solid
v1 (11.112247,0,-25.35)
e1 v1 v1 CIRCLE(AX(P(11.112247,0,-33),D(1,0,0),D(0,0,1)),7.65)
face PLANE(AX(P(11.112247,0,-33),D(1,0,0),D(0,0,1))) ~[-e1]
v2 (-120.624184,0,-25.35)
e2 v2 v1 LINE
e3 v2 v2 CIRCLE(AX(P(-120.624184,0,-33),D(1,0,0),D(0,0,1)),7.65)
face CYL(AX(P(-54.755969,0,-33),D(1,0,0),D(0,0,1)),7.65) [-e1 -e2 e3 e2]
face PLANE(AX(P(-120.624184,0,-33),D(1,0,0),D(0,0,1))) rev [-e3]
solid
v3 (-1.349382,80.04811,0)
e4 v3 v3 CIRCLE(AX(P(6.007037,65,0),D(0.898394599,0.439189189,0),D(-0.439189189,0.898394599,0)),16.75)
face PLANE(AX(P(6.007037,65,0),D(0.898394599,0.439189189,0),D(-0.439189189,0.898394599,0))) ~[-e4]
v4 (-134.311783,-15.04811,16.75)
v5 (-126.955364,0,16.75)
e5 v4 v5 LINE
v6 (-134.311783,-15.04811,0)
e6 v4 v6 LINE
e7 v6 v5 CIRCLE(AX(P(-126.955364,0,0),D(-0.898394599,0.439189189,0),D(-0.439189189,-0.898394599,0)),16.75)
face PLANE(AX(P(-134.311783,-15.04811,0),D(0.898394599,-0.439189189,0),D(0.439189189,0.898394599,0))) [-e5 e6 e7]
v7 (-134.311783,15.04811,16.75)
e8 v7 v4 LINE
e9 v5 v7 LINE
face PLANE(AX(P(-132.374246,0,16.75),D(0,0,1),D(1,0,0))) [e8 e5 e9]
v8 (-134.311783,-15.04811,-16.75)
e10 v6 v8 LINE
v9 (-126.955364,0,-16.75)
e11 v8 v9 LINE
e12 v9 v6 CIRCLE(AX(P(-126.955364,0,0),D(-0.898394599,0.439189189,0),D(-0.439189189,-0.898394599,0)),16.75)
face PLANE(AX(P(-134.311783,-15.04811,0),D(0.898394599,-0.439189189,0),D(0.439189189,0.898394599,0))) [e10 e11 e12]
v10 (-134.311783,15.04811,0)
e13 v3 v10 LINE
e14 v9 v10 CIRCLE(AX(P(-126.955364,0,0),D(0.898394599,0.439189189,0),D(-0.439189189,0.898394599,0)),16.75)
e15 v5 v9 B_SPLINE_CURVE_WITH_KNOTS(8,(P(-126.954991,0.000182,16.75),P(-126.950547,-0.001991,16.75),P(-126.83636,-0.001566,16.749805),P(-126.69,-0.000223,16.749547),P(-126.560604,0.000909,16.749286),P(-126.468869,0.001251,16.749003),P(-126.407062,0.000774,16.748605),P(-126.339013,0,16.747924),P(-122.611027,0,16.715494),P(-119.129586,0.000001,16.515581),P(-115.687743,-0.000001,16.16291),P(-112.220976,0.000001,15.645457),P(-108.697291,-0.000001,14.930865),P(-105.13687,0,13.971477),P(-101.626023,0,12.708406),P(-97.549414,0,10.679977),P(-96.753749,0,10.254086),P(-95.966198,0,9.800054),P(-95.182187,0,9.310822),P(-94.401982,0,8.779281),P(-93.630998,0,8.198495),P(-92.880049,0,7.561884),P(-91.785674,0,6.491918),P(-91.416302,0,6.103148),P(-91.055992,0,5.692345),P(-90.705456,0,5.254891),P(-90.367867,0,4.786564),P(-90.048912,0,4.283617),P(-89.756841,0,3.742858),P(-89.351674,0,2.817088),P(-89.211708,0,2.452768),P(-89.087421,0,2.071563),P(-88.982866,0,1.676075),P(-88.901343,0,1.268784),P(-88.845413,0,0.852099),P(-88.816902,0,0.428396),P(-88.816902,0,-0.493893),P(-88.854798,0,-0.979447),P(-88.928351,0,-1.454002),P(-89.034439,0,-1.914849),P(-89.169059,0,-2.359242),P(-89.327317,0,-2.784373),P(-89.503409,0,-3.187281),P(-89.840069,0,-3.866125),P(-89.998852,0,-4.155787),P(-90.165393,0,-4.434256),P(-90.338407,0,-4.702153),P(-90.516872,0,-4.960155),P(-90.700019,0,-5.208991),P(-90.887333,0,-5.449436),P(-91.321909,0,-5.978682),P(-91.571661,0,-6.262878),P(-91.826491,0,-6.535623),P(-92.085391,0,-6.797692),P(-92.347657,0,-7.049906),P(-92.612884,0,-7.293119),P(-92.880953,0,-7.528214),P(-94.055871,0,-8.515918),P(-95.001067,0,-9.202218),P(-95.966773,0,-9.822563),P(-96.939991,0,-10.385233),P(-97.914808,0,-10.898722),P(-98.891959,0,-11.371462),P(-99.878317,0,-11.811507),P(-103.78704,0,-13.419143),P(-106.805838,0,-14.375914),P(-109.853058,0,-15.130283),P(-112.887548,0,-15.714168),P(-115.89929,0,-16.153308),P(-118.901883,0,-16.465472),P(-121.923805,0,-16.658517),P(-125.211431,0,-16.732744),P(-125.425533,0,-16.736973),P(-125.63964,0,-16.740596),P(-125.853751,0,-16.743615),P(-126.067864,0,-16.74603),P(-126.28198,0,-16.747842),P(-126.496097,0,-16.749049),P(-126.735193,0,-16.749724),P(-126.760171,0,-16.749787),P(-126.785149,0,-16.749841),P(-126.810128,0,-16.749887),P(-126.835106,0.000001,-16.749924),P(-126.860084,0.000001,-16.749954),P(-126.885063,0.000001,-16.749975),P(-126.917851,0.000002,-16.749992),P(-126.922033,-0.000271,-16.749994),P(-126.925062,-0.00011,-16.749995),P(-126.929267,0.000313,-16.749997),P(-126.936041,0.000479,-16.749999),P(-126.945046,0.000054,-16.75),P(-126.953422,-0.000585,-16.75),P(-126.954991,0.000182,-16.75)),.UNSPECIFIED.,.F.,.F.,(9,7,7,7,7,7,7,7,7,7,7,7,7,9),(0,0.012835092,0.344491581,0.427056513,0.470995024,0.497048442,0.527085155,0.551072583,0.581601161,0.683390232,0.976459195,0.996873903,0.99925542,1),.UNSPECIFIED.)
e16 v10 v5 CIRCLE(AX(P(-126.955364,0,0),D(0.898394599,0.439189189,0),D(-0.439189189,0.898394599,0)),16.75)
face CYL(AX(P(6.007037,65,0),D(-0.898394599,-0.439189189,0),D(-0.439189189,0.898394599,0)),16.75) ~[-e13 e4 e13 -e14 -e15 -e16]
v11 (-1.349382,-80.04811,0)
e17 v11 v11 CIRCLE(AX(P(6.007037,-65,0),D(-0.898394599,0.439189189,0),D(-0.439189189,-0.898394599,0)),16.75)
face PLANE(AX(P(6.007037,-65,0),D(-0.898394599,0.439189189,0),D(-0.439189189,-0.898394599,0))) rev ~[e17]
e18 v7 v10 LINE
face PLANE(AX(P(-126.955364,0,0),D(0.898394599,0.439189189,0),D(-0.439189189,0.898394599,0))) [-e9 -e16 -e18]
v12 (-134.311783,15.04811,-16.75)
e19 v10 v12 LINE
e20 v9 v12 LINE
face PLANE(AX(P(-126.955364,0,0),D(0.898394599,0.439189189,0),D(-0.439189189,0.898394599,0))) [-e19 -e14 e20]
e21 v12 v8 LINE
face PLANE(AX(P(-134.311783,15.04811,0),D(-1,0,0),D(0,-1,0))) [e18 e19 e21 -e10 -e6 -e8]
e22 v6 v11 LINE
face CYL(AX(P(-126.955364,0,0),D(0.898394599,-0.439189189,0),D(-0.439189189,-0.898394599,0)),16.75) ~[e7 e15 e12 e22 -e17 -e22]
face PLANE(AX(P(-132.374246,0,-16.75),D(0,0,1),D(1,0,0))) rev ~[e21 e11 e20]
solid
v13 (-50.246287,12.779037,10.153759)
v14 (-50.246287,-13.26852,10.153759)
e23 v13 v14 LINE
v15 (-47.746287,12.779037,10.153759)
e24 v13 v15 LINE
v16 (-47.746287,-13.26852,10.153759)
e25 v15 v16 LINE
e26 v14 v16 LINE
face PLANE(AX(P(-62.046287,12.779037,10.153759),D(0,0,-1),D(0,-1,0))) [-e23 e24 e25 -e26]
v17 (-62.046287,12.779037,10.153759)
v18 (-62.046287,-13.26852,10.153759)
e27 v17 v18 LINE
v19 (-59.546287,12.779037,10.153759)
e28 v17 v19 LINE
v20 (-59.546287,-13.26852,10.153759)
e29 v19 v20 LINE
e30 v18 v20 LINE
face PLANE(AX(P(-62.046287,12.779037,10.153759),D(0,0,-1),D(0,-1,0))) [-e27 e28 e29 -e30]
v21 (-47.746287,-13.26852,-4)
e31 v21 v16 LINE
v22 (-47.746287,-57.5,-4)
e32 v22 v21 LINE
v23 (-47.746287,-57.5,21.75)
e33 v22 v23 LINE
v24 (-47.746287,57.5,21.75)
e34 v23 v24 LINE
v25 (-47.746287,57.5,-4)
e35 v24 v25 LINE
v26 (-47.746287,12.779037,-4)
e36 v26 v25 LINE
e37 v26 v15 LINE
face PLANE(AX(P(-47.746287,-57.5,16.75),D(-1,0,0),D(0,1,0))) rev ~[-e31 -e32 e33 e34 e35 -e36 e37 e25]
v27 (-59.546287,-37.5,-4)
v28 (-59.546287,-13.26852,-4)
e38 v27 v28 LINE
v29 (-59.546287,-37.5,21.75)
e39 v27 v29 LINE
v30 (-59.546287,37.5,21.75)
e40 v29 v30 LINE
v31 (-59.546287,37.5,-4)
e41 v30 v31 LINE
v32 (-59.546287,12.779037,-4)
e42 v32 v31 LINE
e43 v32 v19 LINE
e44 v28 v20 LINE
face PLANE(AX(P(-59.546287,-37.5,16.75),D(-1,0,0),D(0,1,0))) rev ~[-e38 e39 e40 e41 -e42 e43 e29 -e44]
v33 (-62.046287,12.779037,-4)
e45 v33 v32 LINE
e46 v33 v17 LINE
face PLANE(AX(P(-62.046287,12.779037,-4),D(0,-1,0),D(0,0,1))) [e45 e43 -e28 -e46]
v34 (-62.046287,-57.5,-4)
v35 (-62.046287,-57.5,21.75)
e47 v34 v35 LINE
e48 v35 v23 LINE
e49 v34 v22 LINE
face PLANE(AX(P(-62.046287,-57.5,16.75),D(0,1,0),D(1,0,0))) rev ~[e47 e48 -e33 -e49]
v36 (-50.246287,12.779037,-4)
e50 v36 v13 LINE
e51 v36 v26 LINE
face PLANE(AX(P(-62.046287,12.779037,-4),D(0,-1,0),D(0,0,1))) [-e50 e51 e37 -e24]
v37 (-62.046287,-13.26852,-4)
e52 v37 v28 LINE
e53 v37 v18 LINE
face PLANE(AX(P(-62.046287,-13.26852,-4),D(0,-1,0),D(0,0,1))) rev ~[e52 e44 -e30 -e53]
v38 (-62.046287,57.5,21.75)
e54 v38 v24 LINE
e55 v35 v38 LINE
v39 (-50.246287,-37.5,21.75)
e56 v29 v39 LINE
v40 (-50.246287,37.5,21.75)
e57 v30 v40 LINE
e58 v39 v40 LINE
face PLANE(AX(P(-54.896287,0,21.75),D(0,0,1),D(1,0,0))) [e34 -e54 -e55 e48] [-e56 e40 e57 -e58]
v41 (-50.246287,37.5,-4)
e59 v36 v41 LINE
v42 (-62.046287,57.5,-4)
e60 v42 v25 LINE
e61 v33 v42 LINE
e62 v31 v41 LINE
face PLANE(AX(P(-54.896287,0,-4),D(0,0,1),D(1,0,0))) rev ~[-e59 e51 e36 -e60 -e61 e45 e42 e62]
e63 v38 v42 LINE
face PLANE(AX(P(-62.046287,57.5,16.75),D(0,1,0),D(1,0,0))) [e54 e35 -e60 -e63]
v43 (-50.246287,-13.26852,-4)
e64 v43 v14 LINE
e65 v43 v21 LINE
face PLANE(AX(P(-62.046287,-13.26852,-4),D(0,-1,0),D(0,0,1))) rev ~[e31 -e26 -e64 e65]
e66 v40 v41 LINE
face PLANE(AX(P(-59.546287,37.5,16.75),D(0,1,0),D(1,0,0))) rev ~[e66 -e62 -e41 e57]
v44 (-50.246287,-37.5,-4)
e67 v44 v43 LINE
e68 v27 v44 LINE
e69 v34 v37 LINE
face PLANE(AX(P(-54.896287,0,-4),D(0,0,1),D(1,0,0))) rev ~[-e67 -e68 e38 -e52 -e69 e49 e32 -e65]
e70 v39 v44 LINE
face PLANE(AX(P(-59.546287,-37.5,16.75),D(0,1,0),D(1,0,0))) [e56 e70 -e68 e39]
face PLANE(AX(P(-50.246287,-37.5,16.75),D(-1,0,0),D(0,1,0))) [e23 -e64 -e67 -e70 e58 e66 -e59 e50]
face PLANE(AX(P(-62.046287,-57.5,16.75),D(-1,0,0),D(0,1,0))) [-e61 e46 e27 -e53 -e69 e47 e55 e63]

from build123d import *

# Parameters (mm, degrees)
F3_DEPTH = 16.75
F4_W     = 14.3
F4_H     = 115
F4_W_2   = 9.3
F4_H_2   = 75
F5_DEPTH = 20.75
F6_DEPTH = 5
F7_W     = 26.0475566859
F7_H     = 14.153759297
F8_DEPTH = 25
F9_W     = 131.7364319801
F9_H     = 7.65


# Not quite as in the source:
# - a feature of the source that left no trace in its solid (it failed there, or was rolled back) is left out


with BuildPart() as f1:
    # F0 (on Top) → F1 (revolve)
    with BuildSketch(Plane.XY):
        Polygon((-134.3117827935, 15.0481095387), (-126.9553638746, 0), (-50.2462865474, 37.5), (6.0070368258, 65), (-1.3493820931, 80.0481095387), align=None)
    revolve(axis=Axis((-60.4741635244, 32.5, 0), (0.8983945993, 0.4391891892, 0)))

    # F0 (on Top) → F2 (revolve)
    with BuildSketch(Plane.XY):
        Polygon((-50.2462865474, -37.5), (-126.9553638746, 0), (-134.3117827935, -15.0481095387), (-1.3493820931, -80.0481095387), (6.0070368258, -65), align=None)
    revolve(axis=Axis((-60.4741635244, -32.5, 0), (-0.8983945993, 0.4391891892, 0)))

    # F0 (on Top) → F3 (join, symmetric)
    with BuildSketch(Plane.XY):
        Polygon((-134.3117827935, -15.0481095387), (-126.9553638746, 0), (-134.3117827935, 15.0481095387), align=None)
    extrude(amount=F3_DEPTH, both=True)


with BuildPart() as f5:
    # F4 (on face) → F5 (new body)
    with BuildSketch(Plane.XY.offset(16.75)):
        with Locations((-54.8962865474, 0)):
            Rectangle(F4_W, F4_H)
        with Locations((-54.8962865474, 0)):
            Rectangle(F4_W_2, F4_H_2, mode=Mode.SUBTRACT)
    extrude(amount=-F5_DEPTH)

    # F4 (on face) → F6 (join)
    with BuildSketch(Plane.XY.offset(16.75)):
        with Locations((-54.8962865474, 0)):
            Rectangle(F4_W, F4_H)
        with Locations((-54.8962865474, 0)):
            Rectangle(F4_W_2, F4_H_2, mode=Mode.SUBTRACT)
    extrude(amount=F6_DEPTH)

    # F7 (on face) → F8 (cut)
    with BuildSketch(Plane(origin=(-62.0462865474, 0, 0), x_dir=(0, -1, 0), z_dir=(-1, 0, 0))):
        with Locations((0.2447417813, 3.0768796485)):
            Rectangle(F7_W, F7_H)
    extrude(amount=-F8_DEPTH, mode=Mode.SUBTRACT)


with BuildPart() as f10:
    # F9 (on Front) → F10 (revolve)
    with BuildSketch(Plane.XZ):
        with Locations((-54.7559685074, -29.175)):
            Rectangle(F9_W, F9_H)
    revolve(axis=Axis((-54.7559685074, 0, -33), (1, 0, 0)))


solid = Compound([f1.part, f5.part, f10.part])
